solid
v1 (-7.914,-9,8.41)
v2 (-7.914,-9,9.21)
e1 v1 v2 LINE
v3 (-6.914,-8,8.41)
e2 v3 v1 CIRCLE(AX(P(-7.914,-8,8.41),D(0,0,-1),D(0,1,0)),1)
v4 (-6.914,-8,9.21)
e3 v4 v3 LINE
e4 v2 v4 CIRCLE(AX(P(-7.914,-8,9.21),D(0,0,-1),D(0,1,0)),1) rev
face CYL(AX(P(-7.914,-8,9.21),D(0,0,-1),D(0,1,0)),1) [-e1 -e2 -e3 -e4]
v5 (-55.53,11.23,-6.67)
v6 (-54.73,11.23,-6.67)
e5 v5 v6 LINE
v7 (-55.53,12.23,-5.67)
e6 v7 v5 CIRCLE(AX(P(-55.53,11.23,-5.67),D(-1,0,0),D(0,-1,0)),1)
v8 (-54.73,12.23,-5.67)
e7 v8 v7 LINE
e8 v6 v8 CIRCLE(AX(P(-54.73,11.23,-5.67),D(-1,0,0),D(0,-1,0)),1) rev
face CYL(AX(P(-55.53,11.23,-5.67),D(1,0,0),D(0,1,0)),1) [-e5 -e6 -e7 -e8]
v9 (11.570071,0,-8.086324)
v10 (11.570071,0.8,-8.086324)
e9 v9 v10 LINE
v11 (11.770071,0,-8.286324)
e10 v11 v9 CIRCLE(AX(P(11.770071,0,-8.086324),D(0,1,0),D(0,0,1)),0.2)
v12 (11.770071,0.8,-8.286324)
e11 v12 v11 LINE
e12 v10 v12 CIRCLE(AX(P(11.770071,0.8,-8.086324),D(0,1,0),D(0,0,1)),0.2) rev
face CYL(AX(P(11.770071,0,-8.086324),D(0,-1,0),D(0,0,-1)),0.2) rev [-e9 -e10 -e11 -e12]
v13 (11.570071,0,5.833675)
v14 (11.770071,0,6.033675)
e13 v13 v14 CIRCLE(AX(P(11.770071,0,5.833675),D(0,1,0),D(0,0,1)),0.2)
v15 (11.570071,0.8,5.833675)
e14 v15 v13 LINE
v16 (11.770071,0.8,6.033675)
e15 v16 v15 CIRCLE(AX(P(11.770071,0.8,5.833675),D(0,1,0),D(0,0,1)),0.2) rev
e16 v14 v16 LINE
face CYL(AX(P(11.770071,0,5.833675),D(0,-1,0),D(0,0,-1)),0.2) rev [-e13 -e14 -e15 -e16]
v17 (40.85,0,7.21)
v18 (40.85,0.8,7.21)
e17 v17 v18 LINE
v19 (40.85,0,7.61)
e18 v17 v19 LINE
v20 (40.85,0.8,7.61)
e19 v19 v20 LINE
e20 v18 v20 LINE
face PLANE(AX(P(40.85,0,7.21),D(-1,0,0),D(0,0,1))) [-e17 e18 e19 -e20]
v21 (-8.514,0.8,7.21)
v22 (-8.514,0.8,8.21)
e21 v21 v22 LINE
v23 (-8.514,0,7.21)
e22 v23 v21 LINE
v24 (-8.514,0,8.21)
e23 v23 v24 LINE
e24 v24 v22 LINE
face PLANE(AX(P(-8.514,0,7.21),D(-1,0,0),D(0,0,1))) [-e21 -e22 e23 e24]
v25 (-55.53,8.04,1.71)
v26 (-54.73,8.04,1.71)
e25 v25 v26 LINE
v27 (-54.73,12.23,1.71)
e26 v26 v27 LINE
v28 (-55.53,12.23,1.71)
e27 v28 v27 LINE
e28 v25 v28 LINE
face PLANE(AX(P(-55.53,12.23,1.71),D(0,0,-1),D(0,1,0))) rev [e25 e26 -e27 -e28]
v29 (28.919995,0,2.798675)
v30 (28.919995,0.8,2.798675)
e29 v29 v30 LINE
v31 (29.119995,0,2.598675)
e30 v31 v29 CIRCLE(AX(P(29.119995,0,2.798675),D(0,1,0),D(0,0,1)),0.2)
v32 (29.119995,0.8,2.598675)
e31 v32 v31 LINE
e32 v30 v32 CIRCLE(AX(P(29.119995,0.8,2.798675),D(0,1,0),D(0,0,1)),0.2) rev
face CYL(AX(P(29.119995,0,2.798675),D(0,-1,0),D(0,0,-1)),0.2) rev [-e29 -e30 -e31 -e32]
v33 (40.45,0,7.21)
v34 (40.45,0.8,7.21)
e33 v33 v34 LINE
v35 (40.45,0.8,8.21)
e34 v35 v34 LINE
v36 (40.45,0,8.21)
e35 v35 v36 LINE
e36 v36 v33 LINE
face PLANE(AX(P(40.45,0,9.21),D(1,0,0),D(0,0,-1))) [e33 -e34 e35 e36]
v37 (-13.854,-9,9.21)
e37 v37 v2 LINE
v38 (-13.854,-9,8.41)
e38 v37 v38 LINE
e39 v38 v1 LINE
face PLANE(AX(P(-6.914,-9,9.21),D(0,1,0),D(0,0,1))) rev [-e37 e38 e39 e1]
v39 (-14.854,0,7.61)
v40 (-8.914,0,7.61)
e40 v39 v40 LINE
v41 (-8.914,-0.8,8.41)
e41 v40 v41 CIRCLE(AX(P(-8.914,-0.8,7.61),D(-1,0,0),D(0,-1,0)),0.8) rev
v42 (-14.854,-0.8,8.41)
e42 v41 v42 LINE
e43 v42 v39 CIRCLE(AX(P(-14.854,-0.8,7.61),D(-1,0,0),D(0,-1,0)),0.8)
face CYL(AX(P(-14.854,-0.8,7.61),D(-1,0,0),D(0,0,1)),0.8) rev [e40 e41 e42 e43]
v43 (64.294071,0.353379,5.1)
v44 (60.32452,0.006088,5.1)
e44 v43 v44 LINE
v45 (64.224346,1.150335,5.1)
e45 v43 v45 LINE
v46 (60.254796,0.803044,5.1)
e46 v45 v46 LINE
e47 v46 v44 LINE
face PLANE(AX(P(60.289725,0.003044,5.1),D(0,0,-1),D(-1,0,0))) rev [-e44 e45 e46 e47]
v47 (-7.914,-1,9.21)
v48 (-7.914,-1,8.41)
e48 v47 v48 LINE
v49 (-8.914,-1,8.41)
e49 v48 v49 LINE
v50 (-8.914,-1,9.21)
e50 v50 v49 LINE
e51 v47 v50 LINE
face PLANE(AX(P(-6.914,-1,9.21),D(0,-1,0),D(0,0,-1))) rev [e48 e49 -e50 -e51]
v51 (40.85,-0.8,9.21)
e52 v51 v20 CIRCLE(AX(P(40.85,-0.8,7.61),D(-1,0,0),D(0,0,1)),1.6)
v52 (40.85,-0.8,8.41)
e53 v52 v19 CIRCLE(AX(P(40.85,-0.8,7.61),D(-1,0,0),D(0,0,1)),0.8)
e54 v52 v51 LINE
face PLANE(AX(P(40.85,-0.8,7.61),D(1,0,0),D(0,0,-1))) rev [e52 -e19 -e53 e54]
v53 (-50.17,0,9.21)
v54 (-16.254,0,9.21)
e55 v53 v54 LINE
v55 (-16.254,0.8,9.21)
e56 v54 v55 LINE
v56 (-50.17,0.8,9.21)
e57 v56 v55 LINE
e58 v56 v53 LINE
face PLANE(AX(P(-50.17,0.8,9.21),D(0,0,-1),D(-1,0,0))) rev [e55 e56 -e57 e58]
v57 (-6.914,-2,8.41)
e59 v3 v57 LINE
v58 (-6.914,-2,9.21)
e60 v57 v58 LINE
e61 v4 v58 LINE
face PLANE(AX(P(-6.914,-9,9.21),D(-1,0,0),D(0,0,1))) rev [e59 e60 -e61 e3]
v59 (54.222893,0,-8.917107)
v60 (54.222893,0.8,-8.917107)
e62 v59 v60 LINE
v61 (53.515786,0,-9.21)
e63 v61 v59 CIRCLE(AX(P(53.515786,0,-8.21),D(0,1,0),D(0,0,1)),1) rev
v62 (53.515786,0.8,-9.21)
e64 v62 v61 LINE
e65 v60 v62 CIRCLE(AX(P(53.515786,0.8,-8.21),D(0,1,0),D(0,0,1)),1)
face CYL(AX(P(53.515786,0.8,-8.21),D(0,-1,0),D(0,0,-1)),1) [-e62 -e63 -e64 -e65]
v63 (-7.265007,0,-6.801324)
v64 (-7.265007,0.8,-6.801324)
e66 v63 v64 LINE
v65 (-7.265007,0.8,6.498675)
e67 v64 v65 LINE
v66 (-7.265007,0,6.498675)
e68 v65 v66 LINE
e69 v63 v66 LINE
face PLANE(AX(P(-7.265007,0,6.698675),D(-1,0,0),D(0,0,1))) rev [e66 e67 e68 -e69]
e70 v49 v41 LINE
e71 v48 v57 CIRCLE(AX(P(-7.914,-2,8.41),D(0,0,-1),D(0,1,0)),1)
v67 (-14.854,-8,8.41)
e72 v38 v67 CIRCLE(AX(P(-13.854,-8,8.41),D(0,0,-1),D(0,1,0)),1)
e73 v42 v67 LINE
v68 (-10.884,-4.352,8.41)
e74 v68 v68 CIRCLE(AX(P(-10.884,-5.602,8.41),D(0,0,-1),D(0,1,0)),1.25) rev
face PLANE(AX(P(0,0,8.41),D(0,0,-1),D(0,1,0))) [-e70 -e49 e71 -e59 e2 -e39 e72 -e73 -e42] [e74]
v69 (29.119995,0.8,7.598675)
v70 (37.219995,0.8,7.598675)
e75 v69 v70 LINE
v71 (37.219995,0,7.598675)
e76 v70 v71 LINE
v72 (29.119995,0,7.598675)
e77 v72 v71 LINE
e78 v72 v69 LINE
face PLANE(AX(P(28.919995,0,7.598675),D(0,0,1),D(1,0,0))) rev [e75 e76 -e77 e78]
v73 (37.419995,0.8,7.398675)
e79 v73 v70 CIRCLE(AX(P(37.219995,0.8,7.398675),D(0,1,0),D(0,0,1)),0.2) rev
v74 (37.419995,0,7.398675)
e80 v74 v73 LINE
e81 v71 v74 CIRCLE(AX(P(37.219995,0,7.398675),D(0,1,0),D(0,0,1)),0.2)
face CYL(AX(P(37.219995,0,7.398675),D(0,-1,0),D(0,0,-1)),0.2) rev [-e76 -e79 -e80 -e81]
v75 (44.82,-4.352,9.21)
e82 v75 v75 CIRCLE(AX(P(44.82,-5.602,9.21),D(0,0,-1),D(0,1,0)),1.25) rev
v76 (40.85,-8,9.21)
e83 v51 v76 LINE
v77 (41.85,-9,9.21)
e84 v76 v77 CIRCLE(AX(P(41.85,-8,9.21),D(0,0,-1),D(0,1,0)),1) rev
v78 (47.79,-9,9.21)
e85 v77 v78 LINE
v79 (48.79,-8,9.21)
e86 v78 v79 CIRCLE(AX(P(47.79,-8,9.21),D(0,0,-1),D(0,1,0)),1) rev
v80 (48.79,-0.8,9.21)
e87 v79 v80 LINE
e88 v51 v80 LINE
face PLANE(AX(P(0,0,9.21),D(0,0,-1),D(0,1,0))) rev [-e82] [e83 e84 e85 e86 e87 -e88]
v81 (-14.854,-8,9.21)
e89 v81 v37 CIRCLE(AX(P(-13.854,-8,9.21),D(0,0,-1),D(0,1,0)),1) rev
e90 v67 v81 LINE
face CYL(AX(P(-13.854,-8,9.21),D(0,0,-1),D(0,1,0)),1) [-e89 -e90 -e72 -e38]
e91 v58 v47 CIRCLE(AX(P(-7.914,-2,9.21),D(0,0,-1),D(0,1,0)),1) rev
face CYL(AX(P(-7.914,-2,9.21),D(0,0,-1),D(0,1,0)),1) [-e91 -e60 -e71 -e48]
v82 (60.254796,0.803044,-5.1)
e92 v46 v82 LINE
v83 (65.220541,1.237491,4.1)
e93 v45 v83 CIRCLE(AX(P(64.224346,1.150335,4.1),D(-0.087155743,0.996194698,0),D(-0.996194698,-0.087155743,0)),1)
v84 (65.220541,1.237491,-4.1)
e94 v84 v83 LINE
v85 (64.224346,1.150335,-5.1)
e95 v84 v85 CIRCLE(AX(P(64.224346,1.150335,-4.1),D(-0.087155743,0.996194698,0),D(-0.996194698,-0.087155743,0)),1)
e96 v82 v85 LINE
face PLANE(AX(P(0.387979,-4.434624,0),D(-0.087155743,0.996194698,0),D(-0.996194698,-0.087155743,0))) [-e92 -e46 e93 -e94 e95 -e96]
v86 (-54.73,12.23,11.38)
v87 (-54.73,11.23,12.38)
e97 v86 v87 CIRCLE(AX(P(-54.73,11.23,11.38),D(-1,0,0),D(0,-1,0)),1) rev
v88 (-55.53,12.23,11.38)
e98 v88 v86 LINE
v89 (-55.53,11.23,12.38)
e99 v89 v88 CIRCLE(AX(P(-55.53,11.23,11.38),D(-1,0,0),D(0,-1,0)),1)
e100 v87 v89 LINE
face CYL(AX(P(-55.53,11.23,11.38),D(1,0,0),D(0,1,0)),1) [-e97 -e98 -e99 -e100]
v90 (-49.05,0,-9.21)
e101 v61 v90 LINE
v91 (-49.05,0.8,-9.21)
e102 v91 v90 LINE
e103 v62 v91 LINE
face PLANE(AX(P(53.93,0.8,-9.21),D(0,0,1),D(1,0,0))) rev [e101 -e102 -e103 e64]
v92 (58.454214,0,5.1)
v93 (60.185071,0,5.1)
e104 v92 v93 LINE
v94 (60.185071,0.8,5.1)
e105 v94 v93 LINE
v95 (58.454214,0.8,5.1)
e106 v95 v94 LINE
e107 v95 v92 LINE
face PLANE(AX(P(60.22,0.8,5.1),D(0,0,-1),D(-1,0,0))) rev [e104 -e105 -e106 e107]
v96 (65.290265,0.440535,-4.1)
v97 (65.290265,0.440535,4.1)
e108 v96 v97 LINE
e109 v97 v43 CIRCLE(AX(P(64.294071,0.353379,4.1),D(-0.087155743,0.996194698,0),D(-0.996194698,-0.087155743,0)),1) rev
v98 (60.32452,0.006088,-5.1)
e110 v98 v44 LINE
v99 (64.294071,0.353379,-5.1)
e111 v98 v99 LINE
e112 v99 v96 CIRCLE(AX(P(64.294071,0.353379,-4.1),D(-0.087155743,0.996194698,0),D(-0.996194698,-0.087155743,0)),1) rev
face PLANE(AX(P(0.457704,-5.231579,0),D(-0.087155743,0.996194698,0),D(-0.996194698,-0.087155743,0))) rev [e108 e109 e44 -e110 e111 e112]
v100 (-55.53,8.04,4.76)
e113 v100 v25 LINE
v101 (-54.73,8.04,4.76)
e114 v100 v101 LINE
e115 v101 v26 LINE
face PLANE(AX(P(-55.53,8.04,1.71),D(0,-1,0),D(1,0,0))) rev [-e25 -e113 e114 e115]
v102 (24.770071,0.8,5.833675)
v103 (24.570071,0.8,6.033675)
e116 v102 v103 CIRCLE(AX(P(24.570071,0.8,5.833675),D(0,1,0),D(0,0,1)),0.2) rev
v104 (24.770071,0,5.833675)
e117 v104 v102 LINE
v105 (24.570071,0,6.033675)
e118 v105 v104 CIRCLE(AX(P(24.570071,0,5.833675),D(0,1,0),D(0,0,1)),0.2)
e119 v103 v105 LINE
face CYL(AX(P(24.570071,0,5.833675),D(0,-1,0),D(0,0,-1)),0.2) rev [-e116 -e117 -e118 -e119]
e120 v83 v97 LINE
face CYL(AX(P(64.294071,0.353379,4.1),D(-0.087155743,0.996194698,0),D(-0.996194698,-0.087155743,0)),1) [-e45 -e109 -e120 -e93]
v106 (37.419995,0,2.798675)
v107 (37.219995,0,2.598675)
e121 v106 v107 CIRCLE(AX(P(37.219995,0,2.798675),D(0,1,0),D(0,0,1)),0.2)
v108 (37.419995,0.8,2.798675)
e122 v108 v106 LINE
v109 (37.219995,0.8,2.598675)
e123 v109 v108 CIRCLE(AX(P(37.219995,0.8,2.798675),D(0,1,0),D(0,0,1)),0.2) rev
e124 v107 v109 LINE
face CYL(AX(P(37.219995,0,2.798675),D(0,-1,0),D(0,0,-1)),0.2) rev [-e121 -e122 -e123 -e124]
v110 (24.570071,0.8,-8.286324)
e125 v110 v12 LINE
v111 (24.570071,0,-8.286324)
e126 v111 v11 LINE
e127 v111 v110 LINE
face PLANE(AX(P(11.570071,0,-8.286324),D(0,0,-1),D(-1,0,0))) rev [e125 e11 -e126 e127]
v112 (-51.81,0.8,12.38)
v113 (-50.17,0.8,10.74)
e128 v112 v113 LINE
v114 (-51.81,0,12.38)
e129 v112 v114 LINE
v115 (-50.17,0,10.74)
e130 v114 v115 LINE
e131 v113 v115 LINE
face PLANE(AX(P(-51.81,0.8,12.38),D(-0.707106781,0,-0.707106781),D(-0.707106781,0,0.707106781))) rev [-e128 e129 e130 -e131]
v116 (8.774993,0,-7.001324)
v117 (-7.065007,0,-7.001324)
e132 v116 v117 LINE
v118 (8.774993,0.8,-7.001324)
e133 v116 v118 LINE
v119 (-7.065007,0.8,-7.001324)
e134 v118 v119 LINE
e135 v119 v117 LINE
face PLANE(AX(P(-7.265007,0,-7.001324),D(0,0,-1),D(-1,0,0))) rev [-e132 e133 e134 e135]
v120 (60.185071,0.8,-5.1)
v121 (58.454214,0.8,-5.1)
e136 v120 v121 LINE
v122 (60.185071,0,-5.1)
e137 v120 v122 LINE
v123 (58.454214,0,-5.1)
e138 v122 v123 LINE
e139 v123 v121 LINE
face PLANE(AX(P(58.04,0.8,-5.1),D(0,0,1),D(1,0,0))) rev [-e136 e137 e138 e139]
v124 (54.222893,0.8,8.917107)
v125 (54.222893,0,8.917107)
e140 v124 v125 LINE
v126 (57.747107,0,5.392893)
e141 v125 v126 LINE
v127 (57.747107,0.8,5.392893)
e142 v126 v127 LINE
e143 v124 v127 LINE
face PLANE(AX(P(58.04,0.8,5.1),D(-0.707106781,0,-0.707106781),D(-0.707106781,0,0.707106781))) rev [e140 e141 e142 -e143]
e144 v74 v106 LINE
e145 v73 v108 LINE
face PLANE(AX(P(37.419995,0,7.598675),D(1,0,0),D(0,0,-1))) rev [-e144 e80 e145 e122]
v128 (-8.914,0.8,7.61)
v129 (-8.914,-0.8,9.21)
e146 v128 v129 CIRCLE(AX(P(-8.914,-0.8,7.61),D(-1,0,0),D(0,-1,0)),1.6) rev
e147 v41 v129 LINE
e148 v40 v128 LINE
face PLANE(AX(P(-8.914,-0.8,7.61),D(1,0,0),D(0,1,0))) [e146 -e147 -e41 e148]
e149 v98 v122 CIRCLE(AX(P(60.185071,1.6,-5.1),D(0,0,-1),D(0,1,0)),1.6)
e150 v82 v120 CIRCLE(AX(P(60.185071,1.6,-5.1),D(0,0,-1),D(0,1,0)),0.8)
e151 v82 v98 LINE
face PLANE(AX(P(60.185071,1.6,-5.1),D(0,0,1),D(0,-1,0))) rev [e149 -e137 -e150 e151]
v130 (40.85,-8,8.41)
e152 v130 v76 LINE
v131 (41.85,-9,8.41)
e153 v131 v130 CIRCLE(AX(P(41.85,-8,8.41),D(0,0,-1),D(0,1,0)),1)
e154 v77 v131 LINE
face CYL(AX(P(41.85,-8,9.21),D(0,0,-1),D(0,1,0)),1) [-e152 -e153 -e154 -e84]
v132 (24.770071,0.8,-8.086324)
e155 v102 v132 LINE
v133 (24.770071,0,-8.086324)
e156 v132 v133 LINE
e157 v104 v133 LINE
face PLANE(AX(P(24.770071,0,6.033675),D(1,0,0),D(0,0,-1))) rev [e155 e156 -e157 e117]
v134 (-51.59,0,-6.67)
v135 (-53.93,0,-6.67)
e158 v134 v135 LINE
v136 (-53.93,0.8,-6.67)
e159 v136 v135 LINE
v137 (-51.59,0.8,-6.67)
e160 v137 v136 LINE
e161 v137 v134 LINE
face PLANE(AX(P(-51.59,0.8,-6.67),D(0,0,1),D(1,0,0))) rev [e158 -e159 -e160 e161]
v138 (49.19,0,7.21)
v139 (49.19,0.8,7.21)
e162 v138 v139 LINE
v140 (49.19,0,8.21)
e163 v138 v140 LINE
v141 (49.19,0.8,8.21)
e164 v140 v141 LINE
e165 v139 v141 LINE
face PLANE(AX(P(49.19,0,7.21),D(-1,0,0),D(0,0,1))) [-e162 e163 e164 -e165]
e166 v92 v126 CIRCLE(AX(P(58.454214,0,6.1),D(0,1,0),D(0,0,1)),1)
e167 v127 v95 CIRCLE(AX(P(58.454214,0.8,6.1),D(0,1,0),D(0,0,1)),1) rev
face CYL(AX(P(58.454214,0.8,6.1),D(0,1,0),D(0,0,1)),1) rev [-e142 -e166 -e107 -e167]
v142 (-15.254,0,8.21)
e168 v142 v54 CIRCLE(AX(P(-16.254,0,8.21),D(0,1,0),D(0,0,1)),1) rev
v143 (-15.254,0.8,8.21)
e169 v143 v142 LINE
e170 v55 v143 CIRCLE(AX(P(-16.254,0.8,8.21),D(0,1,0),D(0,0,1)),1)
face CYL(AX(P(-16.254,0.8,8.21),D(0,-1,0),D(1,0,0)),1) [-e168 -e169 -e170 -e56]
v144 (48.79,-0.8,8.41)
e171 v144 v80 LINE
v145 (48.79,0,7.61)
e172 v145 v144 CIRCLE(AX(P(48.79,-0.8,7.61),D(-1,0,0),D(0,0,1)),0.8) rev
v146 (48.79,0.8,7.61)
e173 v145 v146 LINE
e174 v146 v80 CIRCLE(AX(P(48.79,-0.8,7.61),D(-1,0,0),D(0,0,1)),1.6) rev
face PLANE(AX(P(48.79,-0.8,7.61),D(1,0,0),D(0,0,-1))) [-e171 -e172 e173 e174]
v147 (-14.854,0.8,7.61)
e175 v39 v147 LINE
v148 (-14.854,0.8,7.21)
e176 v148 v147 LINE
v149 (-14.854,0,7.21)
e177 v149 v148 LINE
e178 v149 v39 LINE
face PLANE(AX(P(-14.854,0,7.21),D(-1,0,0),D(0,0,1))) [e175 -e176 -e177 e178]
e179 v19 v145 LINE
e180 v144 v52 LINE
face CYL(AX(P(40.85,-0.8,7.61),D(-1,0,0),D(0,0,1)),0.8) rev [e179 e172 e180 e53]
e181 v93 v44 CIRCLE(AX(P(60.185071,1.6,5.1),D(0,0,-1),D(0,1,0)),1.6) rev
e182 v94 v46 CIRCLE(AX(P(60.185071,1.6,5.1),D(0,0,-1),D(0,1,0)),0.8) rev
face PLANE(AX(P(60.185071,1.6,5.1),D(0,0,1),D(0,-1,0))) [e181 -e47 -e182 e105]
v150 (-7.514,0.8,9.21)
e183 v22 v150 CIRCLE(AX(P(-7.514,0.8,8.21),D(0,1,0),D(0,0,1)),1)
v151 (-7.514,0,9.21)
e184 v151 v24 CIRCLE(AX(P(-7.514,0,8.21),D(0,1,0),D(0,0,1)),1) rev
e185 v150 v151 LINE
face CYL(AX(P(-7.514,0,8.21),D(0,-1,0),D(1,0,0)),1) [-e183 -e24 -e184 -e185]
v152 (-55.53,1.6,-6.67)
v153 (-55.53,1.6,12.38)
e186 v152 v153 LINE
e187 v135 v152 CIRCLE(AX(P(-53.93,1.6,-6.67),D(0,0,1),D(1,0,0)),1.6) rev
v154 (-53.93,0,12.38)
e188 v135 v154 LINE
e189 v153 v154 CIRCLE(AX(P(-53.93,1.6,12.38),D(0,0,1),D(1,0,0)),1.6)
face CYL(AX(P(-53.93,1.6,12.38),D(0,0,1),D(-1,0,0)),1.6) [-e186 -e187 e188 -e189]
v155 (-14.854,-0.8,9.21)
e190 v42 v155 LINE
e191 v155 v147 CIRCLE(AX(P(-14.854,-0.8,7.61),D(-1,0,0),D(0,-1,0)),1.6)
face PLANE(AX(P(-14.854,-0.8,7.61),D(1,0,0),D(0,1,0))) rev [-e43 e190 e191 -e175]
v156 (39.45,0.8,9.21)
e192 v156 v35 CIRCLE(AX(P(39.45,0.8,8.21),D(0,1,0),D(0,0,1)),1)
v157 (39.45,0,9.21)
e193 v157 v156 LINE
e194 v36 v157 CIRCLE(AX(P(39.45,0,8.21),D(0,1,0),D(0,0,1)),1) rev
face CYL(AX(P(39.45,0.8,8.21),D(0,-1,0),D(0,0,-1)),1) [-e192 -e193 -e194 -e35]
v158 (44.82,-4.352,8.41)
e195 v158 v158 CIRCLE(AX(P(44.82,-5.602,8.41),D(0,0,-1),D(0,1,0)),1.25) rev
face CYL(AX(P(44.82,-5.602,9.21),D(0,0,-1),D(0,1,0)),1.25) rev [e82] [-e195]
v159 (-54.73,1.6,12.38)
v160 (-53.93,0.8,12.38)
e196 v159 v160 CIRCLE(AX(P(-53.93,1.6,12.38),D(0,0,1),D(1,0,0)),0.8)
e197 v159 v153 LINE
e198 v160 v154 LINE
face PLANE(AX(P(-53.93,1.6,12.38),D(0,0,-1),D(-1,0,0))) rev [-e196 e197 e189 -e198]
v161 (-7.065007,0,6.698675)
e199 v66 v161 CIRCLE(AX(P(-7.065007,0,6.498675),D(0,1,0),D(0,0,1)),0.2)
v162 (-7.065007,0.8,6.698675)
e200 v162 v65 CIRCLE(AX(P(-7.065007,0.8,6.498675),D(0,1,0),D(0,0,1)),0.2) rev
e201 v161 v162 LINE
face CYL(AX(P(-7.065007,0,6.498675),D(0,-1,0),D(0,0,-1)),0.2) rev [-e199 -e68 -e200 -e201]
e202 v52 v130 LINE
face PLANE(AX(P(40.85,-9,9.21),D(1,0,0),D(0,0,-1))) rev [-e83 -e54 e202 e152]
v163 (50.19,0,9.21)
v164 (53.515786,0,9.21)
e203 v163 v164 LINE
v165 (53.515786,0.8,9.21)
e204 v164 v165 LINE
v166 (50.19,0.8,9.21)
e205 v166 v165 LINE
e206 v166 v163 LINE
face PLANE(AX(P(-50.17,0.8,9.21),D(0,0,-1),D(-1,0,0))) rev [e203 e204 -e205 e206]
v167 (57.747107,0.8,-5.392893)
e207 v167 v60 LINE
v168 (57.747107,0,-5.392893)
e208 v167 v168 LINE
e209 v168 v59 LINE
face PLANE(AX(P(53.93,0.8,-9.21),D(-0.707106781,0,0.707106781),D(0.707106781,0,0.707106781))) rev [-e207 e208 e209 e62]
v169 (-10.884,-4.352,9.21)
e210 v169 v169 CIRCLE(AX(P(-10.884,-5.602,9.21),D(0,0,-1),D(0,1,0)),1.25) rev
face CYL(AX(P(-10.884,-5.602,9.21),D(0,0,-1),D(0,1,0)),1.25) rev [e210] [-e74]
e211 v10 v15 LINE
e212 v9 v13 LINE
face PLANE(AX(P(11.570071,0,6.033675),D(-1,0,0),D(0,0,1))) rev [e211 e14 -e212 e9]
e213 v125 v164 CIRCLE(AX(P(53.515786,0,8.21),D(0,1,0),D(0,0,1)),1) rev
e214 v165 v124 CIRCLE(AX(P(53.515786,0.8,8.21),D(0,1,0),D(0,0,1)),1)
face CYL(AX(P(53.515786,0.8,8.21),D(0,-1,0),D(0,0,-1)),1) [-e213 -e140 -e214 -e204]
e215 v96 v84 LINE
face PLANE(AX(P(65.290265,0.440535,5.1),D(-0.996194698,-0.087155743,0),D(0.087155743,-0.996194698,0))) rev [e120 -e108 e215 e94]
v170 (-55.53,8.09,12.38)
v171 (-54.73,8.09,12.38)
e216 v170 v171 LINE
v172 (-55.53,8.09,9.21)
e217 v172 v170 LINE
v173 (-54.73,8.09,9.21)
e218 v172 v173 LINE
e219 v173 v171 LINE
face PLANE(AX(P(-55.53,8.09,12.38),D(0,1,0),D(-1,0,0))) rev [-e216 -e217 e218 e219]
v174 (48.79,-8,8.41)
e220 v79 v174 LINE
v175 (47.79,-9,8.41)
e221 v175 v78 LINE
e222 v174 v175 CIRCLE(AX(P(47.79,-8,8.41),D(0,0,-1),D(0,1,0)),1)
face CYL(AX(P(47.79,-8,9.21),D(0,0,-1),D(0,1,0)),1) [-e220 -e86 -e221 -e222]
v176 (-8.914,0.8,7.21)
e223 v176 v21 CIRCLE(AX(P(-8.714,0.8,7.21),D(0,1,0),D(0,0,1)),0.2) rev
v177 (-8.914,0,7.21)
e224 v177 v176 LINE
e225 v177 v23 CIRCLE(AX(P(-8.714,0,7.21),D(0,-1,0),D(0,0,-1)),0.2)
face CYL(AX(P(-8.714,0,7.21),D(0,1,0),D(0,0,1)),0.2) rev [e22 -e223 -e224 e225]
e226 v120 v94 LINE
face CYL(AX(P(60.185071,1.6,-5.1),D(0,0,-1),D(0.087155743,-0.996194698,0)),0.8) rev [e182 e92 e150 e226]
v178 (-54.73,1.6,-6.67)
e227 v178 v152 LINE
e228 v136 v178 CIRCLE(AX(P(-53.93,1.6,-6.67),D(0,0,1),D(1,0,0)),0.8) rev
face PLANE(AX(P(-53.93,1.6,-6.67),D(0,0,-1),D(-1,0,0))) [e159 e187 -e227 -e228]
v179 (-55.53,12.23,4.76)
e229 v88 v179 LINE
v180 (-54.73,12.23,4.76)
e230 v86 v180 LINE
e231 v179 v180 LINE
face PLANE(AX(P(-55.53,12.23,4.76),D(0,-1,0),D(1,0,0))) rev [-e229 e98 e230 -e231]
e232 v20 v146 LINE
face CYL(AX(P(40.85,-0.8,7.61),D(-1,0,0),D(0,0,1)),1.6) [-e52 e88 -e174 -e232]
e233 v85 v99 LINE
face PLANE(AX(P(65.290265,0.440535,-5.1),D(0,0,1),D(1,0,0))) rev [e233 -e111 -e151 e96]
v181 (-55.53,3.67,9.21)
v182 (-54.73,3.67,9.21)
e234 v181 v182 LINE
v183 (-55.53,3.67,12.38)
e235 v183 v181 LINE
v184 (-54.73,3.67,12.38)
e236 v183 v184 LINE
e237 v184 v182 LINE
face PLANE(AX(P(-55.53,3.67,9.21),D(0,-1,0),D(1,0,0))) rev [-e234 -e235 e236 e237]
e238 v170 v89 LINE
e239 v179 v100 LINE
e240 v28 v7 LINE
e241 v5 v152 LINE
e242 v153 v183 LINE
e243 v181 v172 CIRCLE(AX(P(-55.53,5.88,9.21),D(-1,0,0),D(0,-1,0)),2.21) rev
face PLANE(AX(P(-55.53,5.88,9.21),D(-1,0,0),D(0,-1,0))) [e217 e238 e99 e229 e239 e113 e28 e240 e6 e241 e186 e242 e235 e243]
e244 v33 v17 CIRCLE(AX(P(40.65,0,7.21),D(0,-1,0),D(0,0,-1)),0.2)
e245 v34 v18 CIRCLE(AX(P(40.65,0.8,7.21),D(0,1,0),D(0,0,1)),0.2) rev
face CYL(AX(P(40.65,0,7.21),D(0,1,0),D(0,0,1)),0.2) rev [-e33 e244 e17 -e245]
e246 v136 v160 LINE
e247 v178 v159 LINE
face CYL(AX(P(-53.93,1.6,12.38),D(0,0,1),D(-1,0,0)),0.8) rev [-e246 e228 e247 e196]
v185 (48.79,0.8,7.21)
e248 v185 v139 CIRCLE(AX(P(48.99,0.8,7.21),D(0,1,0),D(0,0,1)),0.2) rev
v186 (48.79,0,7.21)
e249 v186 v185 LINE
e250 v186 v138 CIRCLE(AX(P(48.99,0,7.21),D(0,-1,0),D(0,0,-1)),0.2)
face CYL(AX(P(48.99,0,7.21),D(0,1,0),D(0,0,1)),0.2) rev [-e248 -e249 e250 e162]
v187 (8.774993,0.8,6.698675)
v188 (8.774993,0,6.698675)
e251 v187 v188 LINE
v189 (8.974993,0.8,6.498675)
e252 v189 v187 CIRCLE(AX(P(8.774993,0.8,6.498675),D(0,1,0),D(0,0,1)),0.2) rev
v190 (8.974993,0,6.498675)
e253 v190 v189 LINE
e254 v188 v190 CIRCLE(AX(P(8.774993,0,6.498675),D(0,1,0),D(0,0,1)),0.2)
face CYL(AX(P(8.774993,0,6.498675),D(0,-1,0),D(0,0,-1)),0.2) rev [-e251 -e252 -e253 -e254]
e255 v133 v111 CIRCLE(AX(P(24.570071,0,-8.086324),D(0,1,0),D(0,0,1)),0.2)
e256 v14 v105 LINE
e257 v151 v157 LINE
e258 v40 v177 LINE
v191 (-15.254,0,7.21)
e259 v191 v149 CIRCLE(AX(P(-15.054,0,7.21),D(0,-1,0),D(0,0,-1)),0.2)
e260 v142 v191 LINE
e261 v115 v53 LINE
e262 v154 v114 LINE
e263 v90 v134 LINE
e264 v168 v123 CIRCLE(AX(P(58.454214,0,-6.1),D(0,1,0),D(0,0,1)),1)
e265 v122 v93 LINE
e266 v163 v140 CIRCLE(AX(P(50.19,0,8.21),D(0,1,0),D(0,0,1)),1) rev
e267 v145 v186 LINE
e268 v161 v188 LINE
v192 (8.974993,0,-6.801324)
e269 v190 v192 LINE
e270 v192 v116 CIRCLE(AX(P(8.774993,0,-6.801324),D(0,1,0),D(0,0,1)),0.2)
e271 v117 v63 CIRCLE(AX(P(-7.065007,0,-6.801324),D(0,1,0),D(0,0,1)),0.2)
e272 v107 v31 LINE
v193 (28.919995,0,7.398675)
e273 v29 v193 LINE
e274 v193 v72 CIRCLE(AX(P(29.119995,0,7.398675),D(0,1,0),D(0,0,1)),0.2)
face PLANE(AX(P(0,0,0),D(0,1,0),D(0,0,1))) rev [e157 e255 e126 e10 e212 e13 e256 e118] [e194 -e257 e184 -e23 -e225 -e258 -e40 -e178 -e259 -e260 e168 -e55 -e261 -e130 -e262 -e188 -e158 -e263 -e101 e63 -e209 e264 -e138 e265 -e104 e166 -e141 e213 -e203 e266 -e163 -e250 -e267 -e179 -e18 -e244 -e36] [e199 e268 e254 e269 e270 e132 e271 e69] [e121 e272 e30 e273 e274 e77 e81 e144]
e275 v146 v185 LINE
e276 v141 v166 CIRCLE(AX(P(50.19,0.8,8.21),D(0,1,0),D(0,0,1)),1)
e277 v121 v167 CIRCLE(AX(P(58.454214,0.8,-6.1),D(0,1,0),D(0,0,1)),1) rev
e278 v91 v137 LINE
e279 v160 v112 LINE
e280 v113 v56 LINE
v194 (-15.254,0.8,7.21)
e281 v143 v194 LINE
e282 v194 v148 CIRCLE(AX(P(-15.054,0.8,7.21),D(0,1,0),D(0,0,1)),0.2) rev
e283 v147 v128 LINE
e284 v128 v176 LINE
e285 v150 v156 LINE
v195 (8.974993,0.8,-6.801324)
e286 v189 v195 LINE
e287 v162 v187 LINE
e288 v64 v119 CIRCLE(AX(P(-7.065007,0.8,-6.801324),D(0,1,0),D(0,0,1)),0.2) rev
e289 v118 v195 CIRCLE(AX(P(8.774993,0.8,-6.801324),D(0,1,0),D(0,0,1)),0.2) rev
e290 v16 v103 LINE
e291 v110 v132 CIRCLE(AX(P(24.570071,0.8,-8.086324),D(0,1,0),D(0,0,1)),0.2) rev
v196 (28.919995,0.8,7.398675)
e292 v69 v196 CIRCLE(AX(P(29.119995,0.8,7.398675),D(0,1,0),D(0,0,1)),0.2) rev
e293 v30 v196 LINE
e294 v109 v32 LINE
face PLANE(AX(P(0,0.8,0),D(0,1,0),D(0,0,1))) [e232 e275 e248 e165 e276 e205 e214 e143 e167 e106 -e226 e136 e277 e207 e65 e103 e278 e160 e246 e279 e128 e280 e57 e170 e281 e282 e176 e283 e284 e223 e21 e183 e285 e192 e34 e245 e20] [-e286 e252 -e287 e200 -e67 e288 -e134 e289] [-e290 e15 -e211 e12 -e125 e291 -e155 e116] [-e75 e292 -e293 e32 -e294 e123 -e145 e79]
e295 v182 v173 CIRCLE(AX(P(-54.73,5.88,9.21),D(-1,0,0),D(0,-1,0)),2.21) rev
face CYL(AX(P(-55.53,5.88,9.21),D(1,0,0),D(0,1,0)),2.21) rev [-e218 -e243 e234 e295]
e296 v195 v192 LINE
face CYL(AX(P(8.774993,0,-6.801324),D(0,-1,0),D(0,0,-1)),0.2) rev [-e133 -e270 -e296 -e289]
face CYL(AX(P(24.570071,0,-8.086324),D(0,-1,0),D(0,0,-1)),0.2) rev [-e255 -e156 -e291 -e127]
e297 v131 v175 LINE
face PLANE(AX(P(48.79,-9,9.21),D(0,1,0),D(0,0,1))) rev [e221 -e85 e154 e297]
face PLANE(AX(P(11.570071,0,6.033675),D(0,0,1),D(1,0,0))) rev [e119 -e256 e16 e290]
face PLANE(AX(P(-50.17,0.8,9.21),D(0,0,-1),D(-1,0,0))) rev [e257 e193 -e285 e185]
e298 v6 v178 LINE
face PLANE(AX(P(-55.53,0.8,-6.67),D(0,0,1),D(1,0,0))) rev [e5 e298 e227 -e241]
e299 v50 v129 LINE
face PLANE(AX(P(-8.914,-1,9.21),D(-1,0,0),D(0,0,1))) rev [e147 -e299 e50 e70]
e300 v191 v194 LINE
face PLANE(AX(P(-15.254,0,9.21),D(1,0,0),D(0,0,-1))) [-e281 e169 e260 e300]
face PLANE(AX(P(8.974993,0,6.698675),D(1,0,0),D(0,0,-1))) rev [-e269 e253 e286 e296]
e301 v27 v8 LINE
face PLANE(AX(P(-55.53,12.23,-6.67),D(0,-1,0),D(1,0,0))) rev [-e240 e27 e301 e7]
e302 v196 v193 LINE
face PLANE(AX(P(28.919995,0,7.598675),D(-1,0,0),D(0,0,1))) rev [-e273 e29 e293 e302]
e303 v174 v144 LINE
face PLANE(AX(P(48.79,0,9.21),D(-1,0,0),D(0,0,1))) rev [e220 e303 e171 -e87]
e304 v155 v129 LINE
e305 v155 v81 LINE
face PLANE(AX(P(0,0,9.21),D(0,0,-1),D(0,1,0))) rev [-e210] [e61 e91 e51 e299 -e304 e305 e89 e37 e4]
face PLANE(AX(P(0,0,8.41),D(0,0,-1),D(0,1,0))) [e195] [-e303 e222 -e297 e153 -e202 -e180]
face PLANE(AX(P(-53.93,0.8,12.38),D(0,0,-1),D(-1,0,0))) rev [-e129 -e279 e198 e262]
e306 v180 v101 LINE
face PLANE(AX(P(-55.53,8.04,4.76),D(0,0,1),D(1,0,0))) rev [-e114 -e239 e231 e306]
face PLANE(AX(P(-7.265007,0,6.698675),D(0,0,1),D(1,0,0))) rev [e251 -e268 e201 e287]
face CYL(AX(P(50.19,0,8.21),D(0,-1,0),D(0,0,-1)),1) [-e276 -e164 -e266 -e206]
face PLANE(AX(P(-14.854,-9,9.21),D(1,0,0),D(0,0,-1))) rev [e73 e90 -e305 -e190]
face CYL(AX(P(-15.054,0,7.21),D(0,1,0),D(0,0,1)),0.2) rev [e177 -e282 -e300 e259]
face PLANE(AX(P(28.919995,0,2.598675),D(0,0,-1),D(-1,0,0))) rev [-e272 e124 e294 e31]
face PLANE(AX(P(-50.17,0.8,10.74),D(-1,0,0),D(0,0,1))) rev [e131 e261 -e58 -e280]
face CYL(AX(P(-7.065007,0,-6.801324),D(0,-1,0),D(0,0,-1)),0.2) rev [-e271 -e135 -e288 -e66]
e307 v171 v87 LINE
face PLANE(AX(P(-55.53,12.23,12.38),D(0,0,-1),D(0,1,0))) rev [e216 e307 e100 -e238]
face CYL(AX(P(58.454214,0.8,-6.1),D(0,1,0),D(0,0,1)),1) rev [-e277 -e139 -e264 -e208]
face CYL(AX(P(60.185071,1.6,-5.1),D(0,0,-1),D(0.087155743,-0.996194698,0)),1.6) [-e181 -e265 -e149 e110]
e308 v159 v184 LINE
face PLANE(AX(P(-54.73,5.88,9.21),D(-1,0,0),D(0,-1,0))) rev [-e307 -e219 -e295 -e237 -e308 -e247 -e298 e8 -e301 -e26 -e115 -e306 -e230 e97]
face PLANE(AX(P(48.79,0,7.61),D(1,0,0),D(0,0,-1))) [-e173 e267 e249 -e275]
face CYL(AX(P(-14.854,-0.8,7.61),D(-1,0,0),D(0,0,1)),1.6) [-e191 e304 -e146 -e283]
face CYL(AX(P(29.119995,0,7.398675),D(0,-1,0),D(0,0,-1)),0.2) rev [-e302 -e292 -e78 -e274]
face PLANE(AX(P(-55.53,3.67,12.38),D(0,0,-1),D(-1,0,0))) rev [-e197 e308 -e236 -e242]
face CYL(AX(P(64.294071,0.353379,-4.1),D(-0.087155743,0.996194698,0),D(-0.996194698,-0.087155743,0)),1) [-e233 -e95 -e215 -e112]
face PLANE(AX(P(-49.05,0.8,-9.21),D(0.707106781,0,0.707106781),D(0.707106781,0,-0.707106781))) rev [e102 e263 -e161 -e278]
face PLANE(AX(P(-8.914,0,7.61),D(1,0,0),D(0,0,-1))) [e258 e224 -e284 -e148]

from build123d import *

# Parameters (mm, degrees)
SM_BASE_FLANGE_1_DEPTH           = 0.8
SKETCH_25_W                      = 16.240000001
SKETCH_25_H                      = 13.699999542
SKETCH_25_W_2                    = 13.2
SKETCH_25_H_2                    = 14.319999239
SKETCH_25_W_3                    = 8.5
SKETCH_25_H_3                    = 5
CUT_EXTRUDE_1_DEPTH              = 62.484573675
SM_EDGE_FLANGE_1_STRIP_CUT_DEPTH = 10.2
SM_EDGE_FLANGE_1_DEPTH           = 10.2
SM_START                         = -0.8
SM_EDGE_FLANGE_2_DEPTH           = 2.8
SM_START_2                       = 0.715504
SM_EDGE_FLANGE_2_2_OUTLINE_W     = 7.94
SM_EDGE_FLANGE_2_2_OUTLINE_H     = 0.8
SM_EDGE_FLANGE_2_2_DEPTH         = 1.284496
SM_START_3                       = -4.3519999
SM_EDGE_FLANGE_2_3_OUTLINE_W     = 7.94
SM_EDGE_FLANGE_2_3_OUTLINE_H     = 0.8
SM_EDGE_FLANGE_2_3_DEPTH         = 3.5519999
SM_START_4                       = -9
SM_EDGE_FLANGE_2_4_OUTLINE_W     = 7.94
SM_EDGE_FLANGE_2_4_OUTLINE_H     = 0.8
SM_EDGE_FLANGE_2_4_DEPTH         = 2.1479999
SM_START_5                       = 40.85
SM_EDGE_FLANGE_2_5_DEPTH         = 7.94
SM_EDGE_FLANGE_2_6_OUTLINE_W     = 2.5000002
SM_EDGE_FLANGE_2_6_OUTLINE_H     = 0.8
SM_EDGE_FLANGE_2_6_DEPTH         = 2.7199999
SM_START_6                       = 46.0700001
SM_EDGE_FLANGE_2_7_OUTLINE_W     = 2.5000002
SM_EDGE_FLANGE_2_7_OUTLINE_H     = 0.8
SM_EDGE_FLANGE_2_7_DEPTH         = 2.7199999
SM_START_7                       = 41.6657556
SM_EDGE_FLANGE_2_8_DEPTH         = 6.2856216
SM_START_8                       = 8.41
SM_EDGE_FLANGE_2_9_DEPTH         = 0.8
SM_START_9                       = -14.854
SM_EDGE_FLANGE_3_OUTLINE_W       = 8
SM_EDGE_FLANGE_3_OUTLINE_H       = 0.8
SM_EDGE_FLANGE_3_DEPTH           = 2.7199999
SM_START_10                      = -9.6339999
SM_EDGE_FLANGE_3_2_OUTLINE_W     = 8
SM_EDGE_FLANGE_3_2_OUTLINE_H     = 0.8
SM_EDGE_FLANGE_3_2_DEPTH         = 2.7199999
SM_START_11                      = -15.254
SM_EDGE_FLANGE_3_3_DEPTH         = 6.74
SM_EDGE_FLANGE_3_4_DEPTH         = 5.94
SM_EDGE_FLANGE_3_5_DEPTH         = 0.8
SM_START_12                      = -1
SM_EDGE_FLANGE_3_6_DEPTH         = 3
SM_EDGE_FLANGE_4_DEPTH           = 19.05
SM_START_13                      = 0.8
SM_EDGE_FLANGE_4_FLAT_DEPTH      = 0.8
FILLET_1_R                       = 1
FILLET_2_R                       = 0.2


with BuildPart() as part:
    # Базовая кромка1: sheet metal written as solids
    # Sketch 1 → Базовая кромка1 (new body)
    with BuildSketch(Plane(origin=(0, 0, 0), x_dir=(1, 0, 0), z_dir=(0, 1, 0))):
        Polygon((53.93, 9.21), (58.04, 5.1), (60.22, 5.1), (60.22, -5.1), (58.04, -5.1), (53.93, -9.21), (-50.17, -9.21), (-50.17, -10.74), (-51.81, -12.38), (-53.93, -12.38), (-53.93, 6.67), (-51.59, 6.67), (-49.05, 9.21), align=None)
    extrude(amount=SM_BASE_FLANGE_1_DEPTH)

    # Эскиз25 → Вырез-Вытянуть1 (cut, through all)
    with BuildSketch(Plane(origin=(0, 0.8, 0), x_dir=(1, 0, 0), z_dir=(0, 1, 0))):
        with Locations((0.854992541, 0.151324571)):
            Rectangle(SKETCH_25_W, SKETCH_25_H)
        with Locations((18.170071277, 1.126324154)):
            Rectangle(SKETCH_25_W_2, SKETCH_25_H_2)
        with Locations((33.169994901, -5.0986752)):
            Rectangle(SKETCH_25_W_3, SKETCH_25_H_3)
    extrude(amount=-CUT_EXTRUDE_1_DEPTH, mode=Mode.SUBTRACT)

    # Ребро-кромка1: sheet metal written as solids
    # Ребро-кромка1 strip (on a plane across the edge) → Ребро-кромка1 strip cut (cut)
    with BuildSketch(Plane(origin=(60.22, 0.8, 5.1), x_dir=(-0.08715574274765156, 0.9961946980917461, 0), z_dir=(0, 0, -1))):
        Polygon((-1.212259082, 4.677214117), (-0.793911517, -0.104520434), (0.003044242, -0.03479584), (-0.415303324, 4.746938711), align=None)
    extrude(amount=SM_EDGE_FLANGE_1_STRIP_CUT_DEPTH, mode=Mode.SUBTRACT)

    # Ребро-кромка1 section (on a plane across the edge) → Ребро-кромка1 (add)
    with BuildSketch(Plane(origin=(60.22, 0.8, 5.1), x_dir=(-0.08715574274765156, 0.9961946980917461, 0), z_dir=(0, 0, -1))):
        with BuildLine():
            Line((-0.8, 0.034928754), (-0.8, 5.019641982))
            Line((-0.8, 5.019641982), (0, 5.019641982))
            Line((0, 5.019641982), (0, 0.034928754))
            ThreePointArc((0, 0.034928754), (0.000761423, 3.3244e-05), (0.003044242, -0.03479584))
            Line((0.003044242, -0.03479584), (-0.793911517, -0.104520434))
            ThreePointArc((-0.793911517, -0.104520434), (-0.798477155, -0.034862265), (-0.8, 0.034928754))
        make_face()
    extrude(amount=SM_EDGE_FLANGE_1_DEPTH)

    # Ребро-кромка2: read off the stored shape, not the designer's step
    # Ребро-кромка2 outline → Ребро-кромка2 (cut)
    with BuildSketch(Plane(origin=(0, 0, 0), x_dir=(1, 0, 0), z_dir=(0, 1, 0)).offset(SM_START)):
        with BuildLine():
            Line((48.79, -7.21), (48.79, -9.21))
            Line((48.79, -9.21), (49.19, -9.21))
            Line((49.19, -9.21), (49.19, -7.21))
            ThreePointArc((49.19, -7.21), (48.99, -7.01), (48.79, -7.21))
        make_face()
        with BuildLine():
            Line((40.45, -9.21), (40.85, -9.21))
            Line((40.85, -9.21), (40.85, -7.21))
            ThreePointArc((40.85, -7.21), (40.65, -7.01), (40.45, -7.21))
            Line((40.45, -7.21), (40.45, -9.21))
        make_face()
    extrude(amount=SM_EDGE_FLANGE_2_DEPTH, mode=Mode.SUBTRACT)

    # Sm Edge Flange 2 2 outline → Sm Edge Flange 2 2 (cut)
    with BuildSketch(Plane(origin=(0, 0, 0), x_dir=(1, 0, 0), z_dir=(0, 1, 0)).offset(SM_START_2)):
        with Locations((44.82, -8.81)):
            Rectangle(SM_EDGE_FLANGE_2_2_OUTLINE_W, SM_EDGE_FLANGE_2_2_OUTLINE_H)
    extrude(amount=SM_EDGE_FLANGE_2_2_DEPTH, mode=Mode.SUBTRACT)

    # Sm Edge Flange 2 5 outline → Sm Edge Flange 2 5 (cut)
    with BuildSketch(Plane.YZ.offset(SM_START_5)):
        with BuildLine():
            Line((0, 9.21), (0, 8.995640646))
            ThreePointArc((0, 8.995640646), (0.585640646, 8.41), (0.8, 7.61))
            Line((0.8, 7.61), (0.8, 8.41))
            Line((0.8, 8.41), (0.715504, 8.41))
            Line((0.715504, 8.41), (0.715504, 9.21))
            Line((0.715504, 9.21), (0, 9.21))
        make_face()
    extrude(amount=SM_EDGE_FLANGE_2_5_DEPTH, mode=Mode.SUBTRACT)



with BuildPart() as body_2:
    # Sm Edge Flange 2 3 outline → Sm Edge Flange 2 3 (new body)
    with BuildSketch(Plane(origin=(0, 0, 0), x_dir=(1, 0, 0), z_dir=(0, 1, 0)).offset(SM_START_3)):
        with Locations((44.82, -8.81)):
            Rectangle(SM_EDGE_FLANGE_2_3_OUTLINE_W, SM_EDGE_FLANGE_2_3_OUTLINE_H)
    extrude(amount=SM_EDGE_FLANGE_2_3_DEPTH)


with BuildPart() as body_3:
    # Sm Edge Flange 2 4 outline → Sm Edge Flange 2 4 (new body)
    with BuildSketch(Plane(origin=(0, 0, 0), x_dir=(1, 0, 0), z_dir=(0, 1, 0)).offset(SM_START_4)):
        with Locations((44.82, -8.81)):
            Rectangle(SM_EDGE_FLANGE_2_4_OUTLINE_W, SM_EDGE_FLANGE_2_4_OUTLINE_H)
    extrude(amount=SM_EDGE_FLANGE_2_4_DEPTH)


with BuildPart() as part_1:
    add(part.part)

    add(body_2.part)  # Sm Edge Flange 2 6 merges body 2

    add(body_3.part)  # Sm Edge Flange 2 6 merges body 3
    # Sm Edge Flange 2 6 outline → Sm Edge Flange 2 6 (add)
    with BuildSketch(Plane.YZ.offset(SM_START_5)):
        with Locations((-5.602, 8.81)):
            Rectangle(SM_EDGE_FLANGE_2_6_OUTLINE_W, SM_EDGE_FLANGE_2_6_OUTLINE_H)
        with BuildLine():
            ThreePointArc((0, 8.995640646), (-0.385889528, 9.155481322), (-0.8, 9.21))
            Line((-0.8, 9.21), (-0.8, 8.41))
            ThreePointArc((-0.8, 8.41), (-0.234314575, 8.175685425), (0, 7.61))
            Line((0, 7.61), (0, 8.995640646))
        make_face()
    extrude(amount=SM_EDGE_FLANGE_2_6_DEPTH)

    # Sm Edge Flange 2 7 outline → Sm Edge Flange 2 7 (add)
    with BuildSketch(Plane.YZ.offset(SM_START_6)):
        with Locations((-5.602, 8.81)):
            Rectangle(SM_EDGE_FLANGE_2_7_OUTLINE_W, SM_EDGE_FLANGE_2_7_OUTLINE_H)
        with BuildLine():
            ThreePointArc((0, 8.995640646), (-0.385889528, 9.155481322), (-0.8, 9.21))
            Line((-0.8, 9.21), (-0.8, 8.41))
            ThreePointArc((-0.8, 8.41), (-0.234314575, 8.175685425), (0, 7.61))
            Line((0, 7.61), (0, 8.995640646))
        make_face()
    extrude(amount=SM_EDGE_FLANGE_2_7_DEPTH)

    # Sm Edge Flange 2 8 outline → Sm Edge Flange 2 8 (add)
    with BuildSketch(Plane.YZ.offset(SM_START_7)):
        with BuildLine():
            ThreePointArc((0, 8.995640646), (-0.385889528, 9.155481322), (-0.8, 9.21))
            Line((-0.8, 9.21), (-0.8, 8.41))
            ThreePointArc((-0.8, 8.41), (-0.234314575, 8.175685425), (0, 7.61))
            Line((0, 7.61), (0, 8.995640646))
        make_face()
    extrude(amount=SM_EDGE_FLANGE_2_8_DEPTH)

    # Sm Edge Flange 2 9 outline → Sm Edge Flange 2 9 (add)
    with BuildSketch(Plane.XY.offset(SM_START_8)):
        with BuildLine():
            Line((46.0700001, -6.8520001), (46.07, -5.602))
            ThreePointArc((46.07, -5.602), (45.703883476, -6.485883476), (44.82, -6.852))
            Line((44.82, -6.852), (46.0700001, -6.8520001))
        make_face()
        with BuildLine():
            ThreePointArc((44.82, -4.352), (45.703883476, -4.718116524), (46.07, -5.602))
            Line((46.07, -5.602), (46.0700001, -4.3519999))
            Line((46.0700001, -4.3519999), (44.82, -4.352))
        make_face()
        with BuildLine():
            ThreePointArc((43.57, -5.602), (43.936116524, -4.718116524), (44.82, -4.352))
            Line((44.82, -4.352), (43.5699999, -4.3519999))
            Line((43.5699999, -4.3519999), (43.57, -5.602))
        make_face()
        with BuildLine():
            Line((43.5699999, -6.8520001), (44.82, -6.852))
            ThreePointArc((44.82, -6.852), (43.936116524, -6.485883476), (43.57, -5.602))
            Line((43.57, -5.602), (43.5699999, -6.8520001))
        make_face()
    extrude(amount=SM_EDGE_FLANGE_2_9_DEPTH)

    # Sm Edge Flange 3 3 outline → Sm Edge Flange 3 3 (cut)
    with BuildSketch(Plane.YZ.offset(SM_START_11)):
        with BuildLine():
            Line((0, 9.21), (0, 8.995640646))
            ThreePointArc((0, 8.995640646), (0.585640646, 8.41), (0.8, 7.61))
            Line((0.8, 7.61), (0.8, 9.21))
            Line((0.8, 9.21), (0, 9.21))
        make_face()
    extrude(amount=SM_EDGE_FLANGE_3_3_DEPTH, mode=Mode.SUBTRACT)



with BuildPart() as body_2_2:
    # Ребро-кромка3: read off the stored shape, not the designer's step
    # Ребро-кромка3 outline → Ребро-кромка3 (new body)
    with BuildSketch(Plane.YZ.offset(SM_START_9)):
        with Locations((-5, 8.81)):
            Rectangle(SM_EDGE_FLANGE_3_OUTLINE_W, SM_EDGE_FLANGE_3_OUTLINE_H)
    extrude(amount=SM_EDGE_FLANGE_3_DEPTH)


with BuildPart() as body_3_2:
    # Sm Edge Flange 3 2 outline → Sm Edge Flange 3 2 (new body)
    with BuildSketch(Plane.YZ.offset(SM_START_10)):
        with Locations((-5, 8.81)):
            Rectangle(SM_EDGE_FLANGE_3_2_OUTLINE_W, SM_EDGE_FLANGE_3_2_OUTLINE_H)
    extrude(amount=SM_EDGE_FLANGE_3_2_DEPTH)


with BuildPart() as part_2:
    add(part_1.part)

    add(body_2_2.part)  # Sm Edge Flange 3 4 merges body 2 2

    add(body_3_2.part)  # Sm Edge Flange 3 4 merges body 3 2
    # Sm Edge Flange 3 4 outline → Sm Edge Flange 3 4 (add)
    with BuildSketch(Plane.YZ.offset(SM_START_9)):
        with BuildLine():
            Line((-0.8, 9.21), (-1, 9.21))
            Line((-1, 9.21), (-1, 8.41))
            Line((-1, 8.41), (-0.8, 8.41))
            ThreePointArc((-0.8, 8.41), (-0.234314575, 8.175685425), (0, 7.61))
            Line((0, 7.61), (0, 8.995640646))
            ThreePointArc((0, 8.995640646), (-0.385889528, 9.155481322), (-0.8, 9.21))
        make_face()
    extrude(amount=SM_EDGE_FLANGE_3_4_DEPTH)

    # Sm Edge Flange 3 5 outline → Sm Edge Flange 3 5 (add)
    with BuildSketch(Plane.XY.offset(SM_START_8)):
        with BuildLine():
            Line((-9.6339999, -9), (-9.634, -5.602))
            ThreePointArc((-9.634, -5.602), (-10.884, -6.852), (-12.134, -5.602))
            Line((-12.134, -5.602), (-12.1340001, -9))
            Line((-12.1340001, -9), (-9.6339999, -9))
        make_face()
        with BuildLine():
            ThreePointArc((-12.134, -5.602), (-10.884, -4.352), (-9.634, -5.602))
            Line((-9.634, -5.602), (-9.6339999, -1))
            Line((-9.6339999, -1), (-12.1340001, -1))
            Line((-12.1340001, -1), (-12.134, -5.602))
        make_face()
    extrude(amount=SM_EDGE_FLANGE_3_5_DEPTH)

    # Sm Edge Flange 3 6 outline → Sm Edge Flange 3 6 (cut)
    with BuildSketch(Plane(origin=(0, 0, 0), x_dir=(1, 0, 0), z_dir=(0, 1, 0)).offset(SM_START_12)):
        with BuildLine():
            Line((-14.854, -9), (-14.854, -7.21))
            ThreePointArc((-14.854, -7.21), (-15.054, -7.01), (-15.254, -7.21))
            Line((-15.254, -7.21), (-15.254, -9))
            Line((-15.254, -9), (-14.854, -9))
        make_face()
        with BuildLine():
            Line((-8.914, -7.21), (-8.914, -9))
            Line((-8.914, -9), (-8.514, -9))
            Line((-8.514, -9), (-8.514, -7.21))
            ThreePointArc((-8.514, -7.21), (-8.714, -7.01), (-8.914, -7.21))
        make_face()
    extrude(amount=SM_EDGE_FLANGE_3_6_DEPTH, mode=Mode.SUBTRACT)

    # Ребро-кромка4: sheet metal written as solids
    # Ребро-кромка4 bend section (on a plane across the edge) → Ребро-кромка4 (add)
    with BuildSketch(Plane(origin=(-54.73, 0.8, -6.67), x_dir=(1, 0, 0), z_dir=(0, 0, 1))):
        with BuildLine():
            Line((-0.8, 0.8), (0, 0.8))
            ThreePointArc((0, 0.8), (0.234314575, 0.234314575), (0.8, 0))
            Line((0.8, 0), (0.8, -0.8))
            ThreePointArc((0.8, -0.8), (-0.33137085, -0.33137085), (-0.8, 0.8))
        make_face()
    extrude(amount=SM_EDGE_FLANGE_4_DEPTH)

    # Ребро-кромка4 profile (on flange) → Ребро-кромка4 flat (add)
    with BuildSketch(Plane(origin=(-54.73, 0.8, 0), x_dir=(0, 0, 1), z_dir=(-1, 0, 0)).offset(SM_START_13)):
        with BuildLine():
            Line((-6.67, 11.43), (-6.67, 0.8))
            Line((-6.67, 0.8), (12.38, 0.8))
            Line((12.38, 0.8), (12.38, 2.87))
            Line((12.38, 2.87), (9.21, 2.87))
            ThreePointArc((9.21, 2.87), (7, 5.08), (9.21, 7.29))
            Line((9.21, 7.29), (12.38, 7.29))
            Line((12.38, 7.29), (12.38, 11.43))
            Line((12.38, 11.43), (4.76, 11.43))
            Line((4.76, 11.43), (4.76, 7.24))
            Line((4.76, 7.24), (1.71, 7.24))
            Line((1.71, 7.24), (1.71, 11.43))
            Line((1.71, 11.43), (-6.67, 11.43))
        make_face()
    extrude(amount=-SM_EDGE_FLANGE_4_FLAT_DEPTH)

    # Скругление1
    fillet_1_edges = [part_2.edges().sort_by_distance(p)[0] for p in [
        (65.255403026, 0.839012746, 5.1),
        (65.255403026, 0.839012746, -5.1),
        (40.45, 0.4, 9.21),
        (49.19, 0.4, 9.21),
        (48.79, -9, 8.81),
        (40.85, -9, 8.81),
        (-15.254, 0.4, 9.21),
        (-8.514, 0.4, 9.21),
        (-14.854, -9, 8.81),
        (-6.914, -9, 8.81),
        (-6.914, -1, 8.81),
        (53.93, 0.4, -9.21),
        (58.04, 0.4, -5.1),
        (58.04, 0.4, 5.1),
        (53.93, 0.4, 9.21),
        (-55.13, 12.23, -6.67),
        (-55.13, 12.23, 12.38),
    ]]
    fillet(fillet_1_edges, radius=FILLET_1_R)

    # Скругление2
    fillet_2_edges = [part_2.edges().sort_by_distance(p)[0] for p in [
        (-7.26500746, 0.4, 6.6986752),
        (-7.26500746, 0.4, -7.001324342),
        (8.974992541, 0.4, -7.001324342),
        (8.974992541, 0.4, 6.6986752),
        (11.570071277, 0.4, 6.033675466),
        (11.570071277, 0.4, -8.286323773),
        (24.770071277, 0.4, -8.286323773),
        (24.770071277, 0.4, 6.033675466),
        (37.419994901, 0.4, 2.5986752),
        (37.419994901, 0.4, 7.5986752),
        (28.919994901, 0.4, 7.5986752),
        (28.919994901, 0.4, 2.5986752),
    ]]
    fillet(fillet_2_edges, radius=FILLET_2_R)


solid = part_2.part
